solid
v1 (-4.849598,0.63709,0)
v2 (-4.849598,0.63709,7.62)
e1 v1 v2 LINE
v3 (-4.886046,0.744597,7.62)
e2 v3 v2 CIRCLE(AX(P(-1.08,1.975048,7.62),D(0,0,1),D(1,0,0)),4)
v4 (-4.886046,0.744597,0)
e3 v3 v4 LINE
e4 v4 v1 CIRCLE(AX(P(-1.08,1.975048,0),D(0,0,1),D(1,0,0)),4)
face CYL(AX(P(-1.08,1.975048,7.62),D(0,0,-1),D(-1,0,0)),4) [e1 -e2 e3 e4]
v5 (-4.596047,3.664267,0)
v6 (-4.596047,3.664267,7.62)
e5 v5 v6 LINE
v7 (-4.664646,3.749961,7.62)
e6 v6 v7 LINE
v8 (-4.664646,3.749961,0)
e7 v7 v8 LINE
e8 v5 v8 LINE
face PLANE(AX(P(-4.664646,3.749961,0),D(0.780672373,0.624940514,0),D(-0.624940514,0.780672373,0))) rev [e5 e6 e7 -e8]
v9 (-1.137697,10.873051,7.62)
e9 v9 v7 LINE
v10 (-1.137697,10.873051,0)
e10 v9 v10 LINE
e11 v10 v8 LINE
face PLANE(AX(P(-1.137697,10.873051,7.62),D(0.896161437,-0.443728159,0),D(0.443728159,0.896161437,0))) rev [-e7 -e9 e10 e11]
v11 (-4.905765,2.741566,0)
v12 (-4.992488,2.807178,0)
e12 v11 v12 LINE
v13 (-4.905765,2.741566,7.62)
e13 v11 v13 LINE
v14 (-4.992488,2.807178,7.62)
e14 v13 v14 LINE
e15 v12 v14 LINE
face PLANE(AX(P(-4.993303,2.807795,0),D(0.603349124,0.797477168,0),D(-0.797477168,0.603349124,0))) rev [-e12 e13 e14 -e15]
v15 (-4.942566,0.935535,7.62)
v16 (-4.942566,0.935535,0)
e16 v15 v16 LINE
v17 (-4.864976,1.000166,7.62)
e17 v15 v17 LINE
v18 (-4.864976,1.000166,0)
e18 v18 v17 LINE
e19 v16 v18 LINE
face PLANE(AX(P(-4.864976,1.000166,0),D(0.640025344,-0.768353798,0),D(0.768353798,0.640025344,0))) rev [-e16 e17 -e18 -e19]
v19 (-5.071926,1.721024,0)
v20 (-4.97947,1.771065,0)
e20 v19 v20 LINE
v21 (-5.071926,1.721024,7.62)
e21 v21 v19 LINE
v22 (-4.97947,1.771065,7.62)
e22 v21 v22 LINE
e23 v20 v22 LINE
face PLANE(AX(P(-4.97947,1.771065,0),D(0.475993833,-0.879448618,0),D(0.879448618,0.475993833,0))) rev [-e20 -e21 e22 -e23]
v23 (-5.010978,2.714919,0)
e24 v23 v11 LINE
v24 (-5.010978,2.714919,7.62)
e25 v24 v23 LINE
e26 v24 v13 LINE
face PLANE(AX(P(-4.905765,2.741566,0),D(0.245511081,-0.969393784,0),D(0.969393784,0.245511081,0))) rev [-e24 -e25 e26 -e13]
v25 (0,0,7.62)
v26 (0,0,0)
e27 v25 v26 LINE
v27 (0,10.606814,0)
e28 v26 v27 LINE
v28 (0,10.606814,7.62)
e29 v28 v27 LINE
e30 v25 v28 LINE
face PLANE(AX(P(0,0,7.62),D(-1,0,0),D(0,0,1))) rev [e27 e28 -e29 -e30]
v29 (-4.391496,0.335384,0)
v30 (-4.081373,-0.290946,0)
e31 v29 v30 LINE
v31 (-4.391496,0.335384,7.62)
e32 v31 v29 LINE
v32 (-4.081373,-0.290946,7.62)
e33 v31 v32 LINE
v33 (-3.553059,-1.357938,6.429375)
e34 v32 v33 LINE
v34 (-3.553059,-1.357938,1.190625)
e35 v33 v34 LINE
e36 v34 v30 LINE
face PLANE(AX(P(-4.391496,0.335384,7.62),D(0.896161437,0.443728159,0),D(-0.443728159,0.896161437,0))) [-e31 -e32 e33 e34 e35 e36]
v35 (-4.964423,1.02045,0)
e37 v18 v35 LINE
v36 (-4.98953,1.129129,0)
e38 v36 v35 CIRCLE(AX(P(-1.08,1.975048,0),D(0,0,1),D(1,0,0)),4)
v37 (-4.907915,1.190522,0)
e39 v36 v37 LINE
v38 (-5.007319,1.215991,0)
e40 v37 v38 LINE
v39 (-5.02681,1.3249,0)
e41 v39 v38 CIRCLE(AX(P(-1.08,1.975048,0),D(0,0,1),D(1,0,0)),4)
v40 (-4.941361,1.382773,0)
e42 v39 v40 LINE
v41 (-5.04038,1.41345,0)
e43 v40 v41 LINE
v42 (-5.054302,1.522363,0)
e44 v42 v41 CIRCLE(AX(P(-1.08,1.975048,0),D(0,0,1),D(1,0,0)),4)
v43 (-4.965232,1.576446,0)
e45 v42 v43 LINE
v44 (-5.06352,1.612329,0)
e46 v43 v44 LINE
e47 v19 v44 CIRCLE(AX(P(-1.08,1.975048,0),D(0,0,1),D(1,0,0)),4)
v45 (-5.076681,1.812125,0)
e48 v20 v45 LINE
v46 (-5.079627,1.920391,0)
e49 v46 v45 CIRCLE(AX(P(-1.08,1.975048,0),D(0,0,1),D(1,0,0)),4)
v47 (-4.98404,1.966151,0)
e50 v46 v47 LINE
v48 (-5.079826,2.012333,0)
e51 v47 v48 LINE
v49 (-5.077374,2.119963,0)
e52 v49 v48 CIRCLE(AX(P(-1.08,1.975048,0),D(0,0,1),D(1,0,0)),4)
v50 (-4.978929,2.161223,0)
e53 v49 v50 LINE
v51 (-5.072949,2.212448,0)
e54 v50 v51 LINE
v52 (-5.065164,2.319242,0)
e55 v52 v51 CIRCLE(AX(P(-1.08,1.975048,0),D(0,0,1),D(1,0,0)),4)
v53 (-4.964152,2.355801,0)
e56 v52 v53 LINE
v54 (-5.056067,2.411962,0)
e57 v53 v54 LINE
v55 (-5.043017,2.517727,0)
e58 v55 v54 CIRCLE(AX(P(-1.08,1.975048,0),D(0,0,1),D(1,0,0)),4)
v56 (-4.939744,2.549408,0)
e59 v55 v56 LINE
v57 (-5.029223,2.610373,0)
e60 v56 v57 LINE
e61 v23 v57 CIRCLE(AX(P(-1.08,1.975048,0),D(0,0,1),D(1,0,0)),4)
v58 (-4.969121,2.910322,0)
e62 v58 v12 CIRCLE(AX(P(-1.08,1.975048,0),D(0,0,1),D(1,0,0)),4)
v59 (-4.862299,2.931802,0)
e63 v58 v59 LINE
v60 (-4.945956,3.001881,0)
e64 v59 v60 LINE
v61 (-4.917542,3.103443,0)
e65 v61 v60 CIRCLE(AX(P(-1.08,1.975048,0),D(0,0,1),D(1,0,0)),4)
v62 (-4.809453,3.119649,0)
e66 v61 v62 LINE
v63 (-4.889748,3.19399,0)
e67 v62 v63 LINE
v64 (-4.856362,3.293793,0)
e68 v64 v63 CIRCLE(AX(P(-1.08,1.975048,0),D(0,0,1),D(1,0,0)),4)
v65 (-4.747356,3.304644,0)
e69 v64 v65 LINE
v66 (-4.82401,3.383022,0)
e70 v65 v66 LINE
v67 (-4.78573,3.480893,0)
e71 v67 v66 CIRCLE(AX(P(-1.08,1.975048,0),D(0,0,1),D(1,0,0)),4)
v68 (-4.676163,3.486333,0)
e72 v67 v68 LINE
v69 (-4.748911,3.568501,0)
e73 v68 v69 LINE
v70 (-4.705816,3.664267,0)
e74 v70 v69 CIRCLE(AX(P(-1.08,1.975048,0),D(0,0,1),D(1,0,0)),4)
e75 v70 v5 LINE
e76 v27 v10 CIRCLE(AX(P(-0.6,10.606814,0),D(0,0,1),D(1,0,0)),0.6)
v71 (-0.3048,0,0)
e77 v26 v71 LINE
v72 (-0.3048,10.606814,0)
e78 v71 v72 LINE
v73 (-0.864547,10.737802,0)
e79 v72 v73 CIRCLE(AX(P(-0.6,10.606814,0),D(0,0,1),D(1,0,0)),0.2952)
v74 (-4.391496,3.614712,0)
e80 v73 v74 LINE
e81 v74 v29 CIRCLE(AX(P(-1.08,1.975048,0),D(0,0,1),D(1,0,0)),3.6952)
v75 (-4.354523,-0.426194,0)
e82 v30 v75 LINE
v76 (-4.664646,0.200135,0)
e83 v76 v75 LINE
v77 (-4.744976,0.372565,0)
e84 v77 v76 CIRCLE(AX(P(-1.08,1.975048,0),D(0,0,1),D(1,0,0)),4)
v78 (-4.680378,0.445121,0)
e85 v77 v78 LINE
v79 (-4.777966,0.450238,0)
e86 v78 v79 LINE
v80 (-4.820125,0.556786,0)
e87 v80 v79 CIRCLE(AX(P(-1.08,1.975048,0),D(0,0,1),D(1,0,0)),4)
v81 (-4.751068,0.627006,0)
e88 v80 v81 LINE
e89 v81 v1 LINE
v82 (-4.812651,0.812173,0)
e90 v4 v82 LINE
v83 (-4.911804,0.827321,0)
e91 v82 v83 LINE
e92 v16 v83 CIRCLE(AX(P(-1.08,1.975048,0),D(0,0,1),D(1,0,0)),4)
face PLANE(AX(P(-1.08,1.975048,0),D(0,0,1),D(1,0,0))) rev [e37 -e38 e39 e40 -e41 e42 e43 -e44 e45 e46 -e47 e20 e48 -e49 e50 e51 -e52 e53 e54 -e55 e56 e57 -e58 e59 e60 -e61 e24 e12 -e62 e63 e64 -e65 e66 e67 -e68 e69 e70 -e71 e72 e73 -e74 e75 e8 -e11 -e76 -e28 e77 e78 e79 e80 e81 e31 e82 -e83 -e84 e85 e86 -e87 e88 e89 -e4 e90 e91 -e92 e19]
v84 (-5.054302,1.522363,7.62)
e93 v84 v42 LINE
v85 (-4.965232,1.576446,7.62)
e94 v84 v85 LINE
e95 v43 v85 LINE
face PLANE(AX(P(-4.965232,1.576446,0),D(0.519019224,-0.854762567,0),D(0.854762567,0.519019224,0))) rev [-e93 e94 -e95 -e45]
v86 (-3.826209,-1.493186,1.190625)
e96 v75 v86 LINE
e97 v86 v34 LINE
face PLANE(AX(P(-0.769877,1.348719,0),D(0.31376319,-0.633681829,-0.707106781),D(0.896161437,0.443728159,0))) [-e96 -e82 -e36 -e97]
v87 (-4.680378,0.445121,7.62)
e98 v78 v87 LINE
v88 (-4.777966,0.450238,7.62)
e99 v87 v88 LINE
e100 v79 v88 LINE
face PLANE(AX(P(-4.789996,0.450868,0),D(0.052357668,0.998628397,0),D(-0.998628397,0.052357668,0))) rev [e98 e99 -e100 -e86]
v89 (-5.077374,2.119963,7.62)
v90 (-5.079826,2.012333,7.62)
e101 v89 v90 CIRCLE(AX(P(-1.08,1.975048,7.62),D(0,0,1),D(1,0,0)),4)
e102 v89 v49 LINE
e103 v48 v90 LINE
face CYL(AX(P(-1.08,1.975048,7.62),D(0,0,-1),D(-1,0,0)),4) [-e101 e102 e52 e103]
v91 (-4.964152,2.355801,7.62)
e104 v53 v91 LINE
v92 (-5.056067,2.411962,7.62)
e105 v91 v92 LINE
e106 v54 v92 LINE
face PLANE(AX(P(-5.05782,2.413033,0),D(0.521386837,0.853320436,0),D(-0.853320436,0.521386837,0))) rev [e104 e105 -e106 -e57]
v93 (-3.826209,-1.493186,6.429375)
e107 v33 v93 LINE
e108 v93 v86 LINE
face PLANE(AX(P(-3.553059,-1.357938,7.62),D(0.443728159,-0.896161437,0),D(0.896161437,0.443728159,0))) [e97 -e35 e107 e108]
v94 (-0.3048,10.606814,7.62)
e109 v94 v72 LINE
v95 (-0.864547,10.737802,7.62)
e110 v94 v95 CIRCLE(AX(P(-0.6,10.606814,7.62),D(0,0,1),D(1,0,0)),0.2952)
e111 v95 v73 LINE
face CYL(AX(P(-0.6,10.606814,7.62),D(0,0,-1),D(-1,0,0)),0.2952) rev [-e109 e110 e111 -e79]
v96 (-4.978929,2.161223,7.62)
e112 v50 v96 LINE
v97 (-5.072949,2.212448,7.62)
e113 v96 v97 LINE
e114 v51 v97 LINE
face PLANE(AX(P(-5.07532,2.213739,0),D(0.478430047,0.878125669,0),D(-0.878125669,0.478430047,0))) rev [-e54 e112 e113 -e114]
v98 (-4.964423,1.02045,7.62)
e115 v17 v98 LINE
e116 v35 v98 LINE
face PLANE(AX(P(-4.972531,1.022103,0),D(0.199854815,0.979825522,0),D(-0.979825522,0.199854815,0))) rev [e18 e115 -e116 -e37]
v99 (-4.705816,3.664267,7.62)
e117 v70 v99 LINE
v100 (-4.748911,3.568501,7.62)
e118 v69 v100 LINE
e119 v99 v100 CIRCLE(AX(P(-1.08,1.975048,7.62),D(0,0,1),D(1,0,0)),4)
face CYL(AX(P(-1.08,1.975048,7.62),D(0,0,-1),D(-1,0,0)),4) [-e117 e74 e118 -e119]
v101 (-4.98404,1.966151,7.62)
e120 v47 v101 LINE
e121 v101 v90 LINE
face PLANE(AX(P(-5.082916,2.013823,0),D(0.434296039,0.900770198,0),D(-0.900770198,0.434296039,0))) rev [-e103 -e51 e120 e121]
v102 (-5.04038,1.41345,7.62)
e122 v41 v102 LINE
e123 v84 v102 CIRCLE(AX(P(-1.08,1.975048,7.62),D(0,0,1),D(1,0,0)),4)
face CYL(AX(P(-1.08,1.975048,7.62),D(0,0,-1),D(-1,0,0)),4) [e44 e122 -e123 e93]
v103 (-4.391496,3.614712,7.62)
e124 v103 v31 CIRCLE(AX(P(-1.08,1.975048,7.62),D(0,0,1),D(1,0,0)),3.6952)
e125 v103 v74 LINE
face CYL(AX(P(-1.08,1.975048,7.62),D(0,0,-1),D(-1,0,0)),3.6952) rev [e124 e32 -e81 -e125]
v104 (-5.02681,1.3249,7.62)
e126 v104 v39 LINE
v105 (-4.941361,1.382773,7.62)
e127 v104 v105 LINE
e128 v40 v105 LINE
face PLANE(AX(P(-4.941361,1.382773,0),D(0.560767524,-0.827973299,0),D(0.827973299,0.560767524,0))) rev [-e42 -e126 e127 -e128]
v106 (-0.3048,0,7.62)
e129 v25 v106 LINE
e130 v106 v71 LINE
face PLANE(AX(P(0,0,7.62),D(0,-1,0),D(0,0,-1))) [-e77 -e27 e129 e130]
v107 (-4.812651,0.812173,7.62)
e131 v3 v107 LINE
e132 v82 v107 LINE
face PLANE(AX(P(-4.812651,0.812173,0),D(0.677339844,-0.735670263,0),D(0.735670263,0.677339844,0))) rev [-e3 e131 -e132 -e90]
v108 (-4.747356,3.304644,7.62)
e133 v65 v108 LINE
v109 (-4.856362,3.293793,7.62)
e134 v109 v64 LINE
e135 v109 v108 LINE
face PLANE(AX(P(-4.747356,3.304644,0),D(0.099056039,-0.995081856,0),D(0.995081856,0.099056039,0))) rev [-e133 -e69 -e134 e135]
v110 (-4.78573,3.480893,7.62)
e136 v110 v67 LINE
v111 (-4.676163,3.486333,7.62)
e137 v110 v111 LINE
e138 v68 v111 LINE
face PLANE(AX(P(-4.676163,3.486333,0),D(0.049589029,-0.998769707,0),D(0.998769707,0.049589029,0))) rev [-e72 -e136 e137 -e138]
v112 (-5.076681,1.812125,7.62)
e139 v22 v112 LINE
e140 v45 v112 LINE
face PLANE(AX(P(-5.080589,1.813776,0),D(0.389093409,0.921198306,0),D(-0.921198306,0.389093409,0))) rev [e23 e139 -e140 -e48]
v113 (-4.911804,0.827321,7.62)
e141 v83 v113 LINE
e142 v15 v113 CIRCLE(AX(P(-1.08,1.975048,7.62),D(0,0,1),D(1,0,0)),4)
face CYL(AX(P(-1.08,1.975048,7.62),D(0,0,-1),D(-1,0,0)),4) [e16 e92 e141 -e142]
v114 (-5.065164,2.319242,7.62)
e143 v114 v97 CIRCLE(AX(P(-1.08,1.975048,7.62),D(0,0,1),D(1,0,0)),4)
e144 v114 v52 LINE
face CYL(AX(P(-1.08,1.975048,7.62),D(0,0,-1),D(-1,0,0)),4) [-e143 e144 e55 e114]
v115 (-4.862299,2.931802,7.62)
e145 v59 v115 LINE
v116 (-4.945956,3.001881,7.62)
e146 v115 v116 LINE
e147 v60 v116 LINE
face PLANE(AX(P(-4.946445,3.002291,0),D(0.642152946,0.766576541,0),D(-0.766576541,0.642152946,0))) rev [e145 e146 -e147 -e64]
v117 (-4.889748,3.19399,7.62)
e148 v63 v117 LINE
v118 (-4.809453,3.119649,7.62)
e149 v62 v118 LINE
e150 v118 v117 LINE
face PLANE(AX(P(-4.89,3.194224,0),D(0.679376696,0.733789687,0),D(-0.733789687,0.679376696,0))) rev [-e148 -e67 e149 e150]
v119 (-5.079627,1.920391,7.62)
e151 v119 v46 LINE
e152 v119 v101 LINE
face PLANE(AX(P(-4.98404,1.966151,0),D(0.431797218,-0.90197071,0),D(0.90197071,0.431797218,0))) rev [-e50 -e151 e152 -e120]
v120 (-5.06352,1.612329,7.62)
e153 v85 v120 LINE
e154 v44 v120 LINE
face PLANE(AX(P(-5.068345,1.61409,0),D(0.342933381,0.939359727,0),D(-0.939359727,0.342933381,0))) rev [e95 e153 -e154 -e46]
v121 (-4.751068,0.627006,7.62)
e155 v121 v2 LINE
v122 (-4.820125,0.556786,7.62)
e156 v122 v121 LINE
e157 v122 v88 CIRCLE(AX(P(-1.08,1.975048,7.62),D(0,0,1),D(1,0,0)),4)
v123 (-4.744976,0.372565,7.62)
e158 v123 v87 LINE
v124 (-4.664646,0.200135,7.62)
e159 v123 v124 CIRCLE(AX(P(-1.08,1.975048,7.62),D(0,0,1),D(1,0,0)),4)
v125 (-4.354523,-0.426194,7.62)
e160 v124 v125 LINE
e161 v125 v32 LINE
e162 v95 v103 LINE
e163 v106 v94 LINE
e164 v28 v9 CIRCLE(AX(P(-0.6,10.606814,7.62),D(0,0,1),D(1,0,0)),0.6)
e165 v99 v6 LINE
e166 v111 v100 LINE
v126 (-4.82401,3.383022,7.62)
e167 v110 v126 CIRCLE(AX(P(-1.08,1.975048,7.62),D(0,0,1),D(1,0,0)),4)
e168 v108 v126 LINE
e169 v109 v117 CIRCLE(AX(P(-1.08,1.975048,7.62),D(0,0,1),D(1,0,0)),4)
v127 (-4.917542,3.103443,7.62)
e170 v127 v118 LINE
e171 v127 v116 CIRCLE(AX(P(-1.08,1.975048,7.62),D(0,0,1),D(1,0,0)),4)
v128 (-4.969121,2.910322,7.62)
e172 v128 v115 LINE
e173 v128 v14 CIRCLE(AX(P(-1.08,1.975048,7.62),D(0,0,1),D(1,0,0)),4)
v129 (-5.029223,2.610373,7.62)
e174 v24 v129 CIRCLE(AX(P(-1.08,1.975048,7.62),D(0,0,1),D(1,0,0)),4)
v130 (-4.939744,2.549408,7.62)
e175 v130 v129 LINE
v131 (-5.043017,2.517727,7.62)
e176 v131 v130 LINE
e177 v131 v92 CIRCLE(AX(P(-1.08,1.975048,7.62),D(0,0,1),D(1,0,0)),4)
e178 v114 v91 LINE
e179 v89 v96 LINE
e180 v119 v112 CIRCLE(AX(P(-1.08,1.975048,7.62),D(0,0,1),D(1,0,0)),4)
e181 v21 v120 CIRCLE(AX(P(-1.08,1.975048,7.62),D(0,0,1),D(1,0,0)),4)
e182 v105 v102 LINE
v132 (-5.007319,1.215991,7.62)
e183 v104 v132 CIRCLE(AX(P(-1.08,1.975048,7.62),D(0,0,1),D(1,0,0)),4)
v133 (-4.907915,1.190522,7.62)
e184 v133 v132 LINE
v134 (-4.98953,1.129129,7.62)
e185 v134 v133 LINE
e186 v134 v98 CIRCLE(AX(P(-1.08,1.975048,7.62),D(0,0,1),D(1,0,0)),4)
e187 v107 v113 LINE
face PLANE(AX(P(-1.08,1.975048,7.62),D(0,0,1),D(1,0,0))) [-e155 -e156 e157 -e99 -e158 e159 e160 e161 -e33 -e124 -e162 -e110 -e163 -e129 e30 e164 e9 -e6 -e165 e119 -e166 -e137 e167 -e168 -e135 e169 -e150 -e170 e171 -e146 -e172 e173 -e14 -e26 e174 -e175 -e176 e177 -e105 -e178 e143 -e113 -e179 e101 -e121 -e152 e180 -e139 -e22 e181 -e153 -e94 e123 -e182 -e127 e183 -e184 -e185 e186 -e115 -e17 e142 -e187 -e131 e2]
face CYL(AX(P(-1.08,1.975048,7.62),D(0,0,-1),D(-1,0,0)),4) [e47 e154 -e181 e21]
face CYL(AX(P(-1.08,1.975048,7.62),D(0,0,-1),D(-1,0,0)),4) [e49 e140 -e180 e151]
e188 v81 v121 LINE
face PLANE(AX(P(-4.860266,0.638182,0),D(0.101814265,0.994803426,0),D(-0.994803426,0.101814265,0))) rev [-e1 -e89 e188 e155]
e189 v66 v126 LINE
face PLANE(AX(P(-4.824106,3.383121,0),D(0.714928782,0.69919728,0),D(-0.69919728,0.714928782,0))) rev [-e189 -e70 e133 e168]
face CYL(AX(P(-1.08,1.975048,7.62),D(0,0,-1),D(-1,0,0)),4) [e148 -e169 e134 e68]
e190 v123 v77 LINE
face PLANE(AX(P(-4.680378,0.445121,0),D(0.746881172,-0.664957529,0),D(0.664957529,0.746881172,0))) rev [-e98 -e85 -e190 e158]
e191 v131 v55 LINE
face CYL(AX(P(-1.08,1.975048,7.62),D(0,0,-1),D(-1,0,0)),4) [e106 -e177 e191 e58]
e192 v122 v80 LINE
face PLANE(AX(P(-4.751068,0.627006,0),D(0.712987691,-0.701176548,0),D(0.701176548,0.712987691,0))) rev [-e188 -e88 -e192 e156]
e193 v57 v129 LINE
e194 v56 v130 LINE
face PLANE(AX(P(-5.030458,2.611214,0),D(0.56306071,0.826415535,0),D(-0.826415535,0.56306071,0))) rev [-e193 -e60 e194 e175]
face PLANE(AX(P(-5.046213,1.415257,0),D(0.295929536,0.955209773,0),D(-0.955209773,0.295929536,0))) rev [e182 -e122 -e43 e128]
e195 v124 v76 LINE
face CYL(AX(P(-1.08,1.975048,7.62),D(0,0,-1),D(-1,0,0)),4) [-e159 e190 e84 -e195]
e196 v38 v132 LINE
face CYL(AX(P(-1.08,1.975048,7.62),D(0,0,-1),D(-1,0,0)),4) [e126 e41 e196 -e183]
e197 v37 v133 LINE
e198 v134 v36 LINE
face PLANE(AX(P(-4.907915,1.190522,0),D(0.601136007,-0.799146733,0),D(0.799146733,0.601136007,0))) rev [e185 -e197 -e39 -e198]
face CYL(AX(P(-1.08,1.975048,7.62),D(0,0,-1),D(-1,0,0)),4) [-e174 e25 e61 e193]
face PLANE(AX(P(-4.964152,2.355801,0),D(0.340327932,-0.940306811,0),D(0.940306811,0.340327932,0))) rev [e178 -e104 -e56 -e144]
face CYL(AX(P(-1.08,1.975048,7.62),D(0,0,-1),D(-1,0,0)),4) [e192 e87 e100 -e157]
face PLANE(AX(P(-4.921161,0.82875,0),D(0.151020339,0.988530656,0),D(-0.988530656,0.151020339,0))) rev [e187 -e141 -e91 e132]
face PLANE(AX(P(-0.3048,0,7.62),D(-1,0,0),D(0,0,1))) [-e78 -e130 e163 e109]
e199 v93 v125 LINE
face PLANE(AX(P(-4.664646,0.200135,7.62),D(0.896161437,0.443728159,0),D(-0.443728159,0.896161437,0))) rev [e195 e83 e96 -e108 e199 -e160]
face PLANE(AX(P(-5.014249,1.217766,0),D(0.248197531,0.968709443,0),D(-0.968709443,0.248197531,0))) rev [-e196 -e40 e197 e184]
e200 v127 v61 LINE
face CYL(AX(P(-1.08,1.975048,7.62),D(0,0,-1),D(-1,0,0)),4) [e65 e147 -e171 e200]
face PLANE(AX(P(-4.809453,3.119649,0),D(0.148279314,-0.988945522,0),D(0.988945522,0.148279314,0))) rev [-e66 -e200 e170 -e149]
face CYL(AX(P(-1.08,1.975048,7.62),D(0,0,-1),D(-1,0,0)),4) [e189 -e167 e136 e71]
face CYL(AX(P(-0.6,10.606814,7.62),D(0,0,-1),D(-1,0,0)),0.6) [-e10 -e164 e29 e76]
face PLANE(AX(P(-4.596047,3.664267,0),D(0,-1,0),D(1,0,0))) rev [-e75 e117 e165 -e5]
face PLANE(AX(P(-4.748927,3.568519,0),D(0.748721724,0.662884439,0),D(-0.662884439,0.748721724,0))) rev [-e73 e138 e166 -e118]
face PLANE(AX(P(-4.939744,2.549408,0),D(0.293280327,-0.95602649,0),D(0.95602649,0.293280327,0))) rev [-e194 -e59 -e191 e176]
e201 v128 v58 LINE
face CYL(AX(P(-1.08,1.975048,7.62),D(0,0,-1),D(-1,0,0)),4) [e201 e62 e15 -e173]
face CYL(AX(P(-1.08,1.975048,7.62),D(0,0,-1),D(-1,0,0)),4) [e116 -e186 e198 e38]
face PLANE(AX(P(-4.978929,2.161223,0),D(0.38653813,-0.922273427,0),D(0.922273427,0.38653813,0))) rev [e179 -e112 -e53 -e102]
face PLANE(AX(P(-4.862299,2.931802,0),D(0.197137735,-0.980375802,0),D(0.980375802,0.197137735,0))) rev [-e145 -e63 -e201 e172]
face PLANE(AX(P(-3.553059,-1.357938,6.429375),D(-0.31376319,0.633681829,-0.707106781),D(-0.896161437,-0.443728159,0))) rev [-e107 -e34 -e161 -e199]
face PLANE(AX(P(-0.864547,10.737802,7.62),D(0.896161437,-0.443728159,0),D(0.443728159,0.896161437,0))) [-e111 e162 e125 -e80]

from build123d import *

# Parameters (mm, degrees)
EXTRUDE_THIN1_DEPTH = 7.62
CHAMFER1_SIZE       = 1.190625
CUT_EXTRUDE1_DEPTH  = 15.472853006
CRVPATTERN1_DEPTH   = 7.62


# Read off the part's stored shape, not the designer's step: CrvPattern1
with BuildPart() as part:
    # Sketch2 → Extrude-Thin1 (new body)
    with BuildSketch(Plane.XY):
        with BuildLine():
            Line((0, 0), (0, 10.606813737))
            ThreePointArc((0, 10.606813737), (-0.463285182, 11.191030357), (-1.137696862, 10.873050632))
            Line((-1.137696862, 10.873050632), (-4.664645747, 3.749960706))
            ThreePointArc((-4.664645747, 3.749960706), (-5.08, 1.975048069), (-4.664645747, 0.200135433))
            Line((-4.664645747, 0.200135433), (-3.82620918, -1.493186263))
            Line((-3.82620918, -1.493186263), (-3.553059174, -1.35793792))
            Line((-3.553059174, -1.35793792), (-4.391495741, 0.335383776))
            ThreePointArc((-4.391495741, 0.335383776), (-4.7752, 1.975048069), (-4.391495741, 3.614712363))
            Line((-4.391495741, 3.614712363), (-0.864546856, 10.737802289))
            ThreePointArc((-0.864546856, 10.737802289), (-0.53273631, 10.894248314), (-0.3048, 10.606813737))
            Line((-0.3048, 10.606813737), (-0.3048, 0))
            Line((-0.3048, 0), (0, 0))
        make_face()
    extrude(amount=EXTRUDE_THIN1_DEPTH)

    # Chamfer1
    chamfer1_edges = [part.edges().sort_by_distance(p)[0] for p in [
        (-3.689634177, -1.425562092, 0),
        (-3.689634177, -1.425562092, 7.62),
    ]]
    chamfer(chamfer1_edges, length=CHAMFER1_SIZE)

    # Sketch4 → Cut-Extrude1 (cut, through all)
    with BuildSketch(Plane.XY.offset(7.62)):
        with BuildLine():
            Line((-4.664645747, 3.749960706), (-4.596046712, 3.664267155))
            Line((-4.596046712, 3.664267155), (-4.705815616, 3.664267155))
            ThreePointArc((-4.705815616, 3.664267155), (-4.685485281, 3.707236248), (-4.664645747, 3.749960706))
        make_face()
    extrude(amount=-CUT_EXTRUDE1_DEPTH, mode=Mode.SUBTRACT)

    # CrvPattern1 outline → CrvPattern1 (cut)
    with BuildSketch(Plane.XY):
        with BuildLine():
            Line((-4.744975764, 0.372564793), (-4.680378039, 0.445121042))
            Line((-4.680378039, 0.445121042), (-4.777966042, 0.450237541))
            ThreePointArc((-4.777966042, 0.450237541), (-4.761675743, 0.411314165), (-4.744975764, 0.372564793))
        make_face()
        with BuildLine():
            ThreePointArc((-4.748910862, 3.568501265), (-4.767580416, 3.524806333), (-4.785729607, 3.48089271))
            Line((-4.785729607, 3.48089271), (-4.676162545, 3.486332727))
            Line((-4.676162545, 3.486332727), (-4.748910862, 3.568501265))
        make_face()
        with BuildLine():
            ThreePointArc((-4.824009644, 3.383022425), (-4.840450562, 3.338503815), (-4.856362147, 3.293793281))
            Line((-4.856362147, 3.293793281), (-4.747356217, 3.304644344))
            Line((-4.747356217, 3.304644344), (-4.824009644, 3.383022425))
        make_face()
        with BuildLine():
            ThreePointArc((-4.889747992, 3.19399033), (-4.903912846, 3.148798701), (-4.917541653, 3.103442532))
            Line((-4.917541653, 3.103442532), (-4.809452549, 3.119649065))
            Line((-4.809452549, 3.119649065), (-4.889747992, 3.19399033))
        make_face()
        with BuildLine():
            ThreePointArc((-4.945955852, 3.001880747), (-4.957808713, 2.956169664), (-4.969121106, 2.910321838))
            Line((-4.969121106, 2.910321838), (-4.862298748, 2.931802088))
            Line((-4.862298748, 2.931802088), (-4.945955852, 3.001880747))
        make_face()
        with BuildLine():
            ThreePointArc((-4.992487715, 2.807177794), (-5.002004339, 2.761102753), (-5.010978384, 2.714918968))
            Line((-5.010978384, 2.714918968), (-4.905764782, 2.741565627))
            Line((-4.905764782, 2.741565627), (-4.992487715, 2.807177794))
        make_face()
        with BuildLine():
            ThreePointArc((-5.02922305, 2.610372633), (-5.036390971, 2.564090075), (-5.043016507, 2.517726765))
            Line((-5.043016507, 2.517726765), (-4.939743698, 2.549407773))
            Line((-4.939743698, 2.549407773), (-5.02922305, 2.610372633))
        make_face()
        with BuildLine():
            ThreePointArc((-5.056066661, 2.411962141), (-5.060885198, 2.365628463), (-5.06516382, 2.319241812))
            Line((-5.06516382, 2.319241812), (-4.96415189, 2.355801348))
            Line((-4.96415189, 2.355801348), (-5.056066661, 2.411962141))
        make_face()
        with BuildLine():
            ThreePointArc((-5.07294897, 2.212447566), (-5.075429139, 2.166218137), (-5.077374093, 2.1199631))
            Line((-5.077374093, 2.1199631), (-4.978929297, 2.161222738))
            Line((-4.978929297, 2.161222738), (-5.07294897, 2.212447566))
        make_face()
        with BuildLine():
            ThreePointArc((-5.079826224, 2.012333162), (-5.079990568, 1.966361356), (-5.079626554, 1.920390698))
            Line((-5.079626554, 1.920390698), (-4.98403956, 1.966150718))
            Line((-4.98403956, 1.966150718), (-5.079826224, 2.012333162))
        make_face()
        with BuildLine():
            ThreePointArc((-5.076680625, 1.812124816), (-5.074562951, 1.766561064), (-5.071925849, 1.721024422))
            Line((-5.071925849, 1.721024422), (-4.979470103, 1.771065282))
            Line((-4.979470103, 1.771065282), (-5.076680625, 1.812124816))
        make_face()
        with BuildLine():
            ThreePointArc((-5.063520382, 1.612328668), (-5.059165421, 1.567319544), (-5.054301926, 1.522362527))
            Line((-5.054301926, 1.522362527), (-4.965232171, 1.576446452))
            Line((-4.965232171, 1.576446452), (-5.063520382, 1.612328668))
        make_face()
        with BuildLine():
            ThreePointArc((-5.040379693, 1.413449735), (-5.033842672, 1.369137078), (-5.026809852, 1.324900401))
            Line((-5.026809852, 1.324900401), (-4.941360798, 1.382773106))
            Line((-4.941360798, 1.382773106), (-5.040379693, 1.413449735))
        make_face()
        with BuildLine():
            ThreePointArc((-5.007318634, 1.215990531), (-4.998664778, 1.172510618), (-4.989529564, 1.129129286))
            Line((-4.989529564, 1.129129286), (-4.907914719, 1.190521793))
            Line((-4.907914719, 1.190521793), (-5.007318634, 1.215990531))
        make_face()
        with BuildLine():
            ThreePointArc((-4.964422988, 1.020449699), (-4.953726948, 0.977932464), (-4.942565548, 0.935535016))
            Line((-4.942565548, 0.935535016), (-4.864976234, 1.000165564))
            Line((-4.864976234, 1.000165564), (-4.964422988, 1.020449699))
        make_face()
        with BuildLine():
            ThreePointArc((-4.911803987, 0.827320662), (-4.899149207, 0.785888981), (-4.886046457, 0.744596783))
            Line((-4.886046457, 0.744596783), (-4.812650995, 0.812172807))
            Line((-4.812650995, 0.812172807), (-4.911803987, 0.827320662))
        make_face()
        with BuildLine():
            ThreePointArc((-4.849597983, 0.63709028), (-4.835076, 0.596859317), (-4.820124666, 0.556785934))
            Line((-4.820124666, 0.556785934), (-4.751067753, 0.627006093))
            Line((-4.751067753, 0.627006093), (-4.849597983, 0.63709028))
        make_face()
    extrude(amount=CRVPATTERN1_DEPTH, mode=Mode.SUBTRACT)


solid = part.part
